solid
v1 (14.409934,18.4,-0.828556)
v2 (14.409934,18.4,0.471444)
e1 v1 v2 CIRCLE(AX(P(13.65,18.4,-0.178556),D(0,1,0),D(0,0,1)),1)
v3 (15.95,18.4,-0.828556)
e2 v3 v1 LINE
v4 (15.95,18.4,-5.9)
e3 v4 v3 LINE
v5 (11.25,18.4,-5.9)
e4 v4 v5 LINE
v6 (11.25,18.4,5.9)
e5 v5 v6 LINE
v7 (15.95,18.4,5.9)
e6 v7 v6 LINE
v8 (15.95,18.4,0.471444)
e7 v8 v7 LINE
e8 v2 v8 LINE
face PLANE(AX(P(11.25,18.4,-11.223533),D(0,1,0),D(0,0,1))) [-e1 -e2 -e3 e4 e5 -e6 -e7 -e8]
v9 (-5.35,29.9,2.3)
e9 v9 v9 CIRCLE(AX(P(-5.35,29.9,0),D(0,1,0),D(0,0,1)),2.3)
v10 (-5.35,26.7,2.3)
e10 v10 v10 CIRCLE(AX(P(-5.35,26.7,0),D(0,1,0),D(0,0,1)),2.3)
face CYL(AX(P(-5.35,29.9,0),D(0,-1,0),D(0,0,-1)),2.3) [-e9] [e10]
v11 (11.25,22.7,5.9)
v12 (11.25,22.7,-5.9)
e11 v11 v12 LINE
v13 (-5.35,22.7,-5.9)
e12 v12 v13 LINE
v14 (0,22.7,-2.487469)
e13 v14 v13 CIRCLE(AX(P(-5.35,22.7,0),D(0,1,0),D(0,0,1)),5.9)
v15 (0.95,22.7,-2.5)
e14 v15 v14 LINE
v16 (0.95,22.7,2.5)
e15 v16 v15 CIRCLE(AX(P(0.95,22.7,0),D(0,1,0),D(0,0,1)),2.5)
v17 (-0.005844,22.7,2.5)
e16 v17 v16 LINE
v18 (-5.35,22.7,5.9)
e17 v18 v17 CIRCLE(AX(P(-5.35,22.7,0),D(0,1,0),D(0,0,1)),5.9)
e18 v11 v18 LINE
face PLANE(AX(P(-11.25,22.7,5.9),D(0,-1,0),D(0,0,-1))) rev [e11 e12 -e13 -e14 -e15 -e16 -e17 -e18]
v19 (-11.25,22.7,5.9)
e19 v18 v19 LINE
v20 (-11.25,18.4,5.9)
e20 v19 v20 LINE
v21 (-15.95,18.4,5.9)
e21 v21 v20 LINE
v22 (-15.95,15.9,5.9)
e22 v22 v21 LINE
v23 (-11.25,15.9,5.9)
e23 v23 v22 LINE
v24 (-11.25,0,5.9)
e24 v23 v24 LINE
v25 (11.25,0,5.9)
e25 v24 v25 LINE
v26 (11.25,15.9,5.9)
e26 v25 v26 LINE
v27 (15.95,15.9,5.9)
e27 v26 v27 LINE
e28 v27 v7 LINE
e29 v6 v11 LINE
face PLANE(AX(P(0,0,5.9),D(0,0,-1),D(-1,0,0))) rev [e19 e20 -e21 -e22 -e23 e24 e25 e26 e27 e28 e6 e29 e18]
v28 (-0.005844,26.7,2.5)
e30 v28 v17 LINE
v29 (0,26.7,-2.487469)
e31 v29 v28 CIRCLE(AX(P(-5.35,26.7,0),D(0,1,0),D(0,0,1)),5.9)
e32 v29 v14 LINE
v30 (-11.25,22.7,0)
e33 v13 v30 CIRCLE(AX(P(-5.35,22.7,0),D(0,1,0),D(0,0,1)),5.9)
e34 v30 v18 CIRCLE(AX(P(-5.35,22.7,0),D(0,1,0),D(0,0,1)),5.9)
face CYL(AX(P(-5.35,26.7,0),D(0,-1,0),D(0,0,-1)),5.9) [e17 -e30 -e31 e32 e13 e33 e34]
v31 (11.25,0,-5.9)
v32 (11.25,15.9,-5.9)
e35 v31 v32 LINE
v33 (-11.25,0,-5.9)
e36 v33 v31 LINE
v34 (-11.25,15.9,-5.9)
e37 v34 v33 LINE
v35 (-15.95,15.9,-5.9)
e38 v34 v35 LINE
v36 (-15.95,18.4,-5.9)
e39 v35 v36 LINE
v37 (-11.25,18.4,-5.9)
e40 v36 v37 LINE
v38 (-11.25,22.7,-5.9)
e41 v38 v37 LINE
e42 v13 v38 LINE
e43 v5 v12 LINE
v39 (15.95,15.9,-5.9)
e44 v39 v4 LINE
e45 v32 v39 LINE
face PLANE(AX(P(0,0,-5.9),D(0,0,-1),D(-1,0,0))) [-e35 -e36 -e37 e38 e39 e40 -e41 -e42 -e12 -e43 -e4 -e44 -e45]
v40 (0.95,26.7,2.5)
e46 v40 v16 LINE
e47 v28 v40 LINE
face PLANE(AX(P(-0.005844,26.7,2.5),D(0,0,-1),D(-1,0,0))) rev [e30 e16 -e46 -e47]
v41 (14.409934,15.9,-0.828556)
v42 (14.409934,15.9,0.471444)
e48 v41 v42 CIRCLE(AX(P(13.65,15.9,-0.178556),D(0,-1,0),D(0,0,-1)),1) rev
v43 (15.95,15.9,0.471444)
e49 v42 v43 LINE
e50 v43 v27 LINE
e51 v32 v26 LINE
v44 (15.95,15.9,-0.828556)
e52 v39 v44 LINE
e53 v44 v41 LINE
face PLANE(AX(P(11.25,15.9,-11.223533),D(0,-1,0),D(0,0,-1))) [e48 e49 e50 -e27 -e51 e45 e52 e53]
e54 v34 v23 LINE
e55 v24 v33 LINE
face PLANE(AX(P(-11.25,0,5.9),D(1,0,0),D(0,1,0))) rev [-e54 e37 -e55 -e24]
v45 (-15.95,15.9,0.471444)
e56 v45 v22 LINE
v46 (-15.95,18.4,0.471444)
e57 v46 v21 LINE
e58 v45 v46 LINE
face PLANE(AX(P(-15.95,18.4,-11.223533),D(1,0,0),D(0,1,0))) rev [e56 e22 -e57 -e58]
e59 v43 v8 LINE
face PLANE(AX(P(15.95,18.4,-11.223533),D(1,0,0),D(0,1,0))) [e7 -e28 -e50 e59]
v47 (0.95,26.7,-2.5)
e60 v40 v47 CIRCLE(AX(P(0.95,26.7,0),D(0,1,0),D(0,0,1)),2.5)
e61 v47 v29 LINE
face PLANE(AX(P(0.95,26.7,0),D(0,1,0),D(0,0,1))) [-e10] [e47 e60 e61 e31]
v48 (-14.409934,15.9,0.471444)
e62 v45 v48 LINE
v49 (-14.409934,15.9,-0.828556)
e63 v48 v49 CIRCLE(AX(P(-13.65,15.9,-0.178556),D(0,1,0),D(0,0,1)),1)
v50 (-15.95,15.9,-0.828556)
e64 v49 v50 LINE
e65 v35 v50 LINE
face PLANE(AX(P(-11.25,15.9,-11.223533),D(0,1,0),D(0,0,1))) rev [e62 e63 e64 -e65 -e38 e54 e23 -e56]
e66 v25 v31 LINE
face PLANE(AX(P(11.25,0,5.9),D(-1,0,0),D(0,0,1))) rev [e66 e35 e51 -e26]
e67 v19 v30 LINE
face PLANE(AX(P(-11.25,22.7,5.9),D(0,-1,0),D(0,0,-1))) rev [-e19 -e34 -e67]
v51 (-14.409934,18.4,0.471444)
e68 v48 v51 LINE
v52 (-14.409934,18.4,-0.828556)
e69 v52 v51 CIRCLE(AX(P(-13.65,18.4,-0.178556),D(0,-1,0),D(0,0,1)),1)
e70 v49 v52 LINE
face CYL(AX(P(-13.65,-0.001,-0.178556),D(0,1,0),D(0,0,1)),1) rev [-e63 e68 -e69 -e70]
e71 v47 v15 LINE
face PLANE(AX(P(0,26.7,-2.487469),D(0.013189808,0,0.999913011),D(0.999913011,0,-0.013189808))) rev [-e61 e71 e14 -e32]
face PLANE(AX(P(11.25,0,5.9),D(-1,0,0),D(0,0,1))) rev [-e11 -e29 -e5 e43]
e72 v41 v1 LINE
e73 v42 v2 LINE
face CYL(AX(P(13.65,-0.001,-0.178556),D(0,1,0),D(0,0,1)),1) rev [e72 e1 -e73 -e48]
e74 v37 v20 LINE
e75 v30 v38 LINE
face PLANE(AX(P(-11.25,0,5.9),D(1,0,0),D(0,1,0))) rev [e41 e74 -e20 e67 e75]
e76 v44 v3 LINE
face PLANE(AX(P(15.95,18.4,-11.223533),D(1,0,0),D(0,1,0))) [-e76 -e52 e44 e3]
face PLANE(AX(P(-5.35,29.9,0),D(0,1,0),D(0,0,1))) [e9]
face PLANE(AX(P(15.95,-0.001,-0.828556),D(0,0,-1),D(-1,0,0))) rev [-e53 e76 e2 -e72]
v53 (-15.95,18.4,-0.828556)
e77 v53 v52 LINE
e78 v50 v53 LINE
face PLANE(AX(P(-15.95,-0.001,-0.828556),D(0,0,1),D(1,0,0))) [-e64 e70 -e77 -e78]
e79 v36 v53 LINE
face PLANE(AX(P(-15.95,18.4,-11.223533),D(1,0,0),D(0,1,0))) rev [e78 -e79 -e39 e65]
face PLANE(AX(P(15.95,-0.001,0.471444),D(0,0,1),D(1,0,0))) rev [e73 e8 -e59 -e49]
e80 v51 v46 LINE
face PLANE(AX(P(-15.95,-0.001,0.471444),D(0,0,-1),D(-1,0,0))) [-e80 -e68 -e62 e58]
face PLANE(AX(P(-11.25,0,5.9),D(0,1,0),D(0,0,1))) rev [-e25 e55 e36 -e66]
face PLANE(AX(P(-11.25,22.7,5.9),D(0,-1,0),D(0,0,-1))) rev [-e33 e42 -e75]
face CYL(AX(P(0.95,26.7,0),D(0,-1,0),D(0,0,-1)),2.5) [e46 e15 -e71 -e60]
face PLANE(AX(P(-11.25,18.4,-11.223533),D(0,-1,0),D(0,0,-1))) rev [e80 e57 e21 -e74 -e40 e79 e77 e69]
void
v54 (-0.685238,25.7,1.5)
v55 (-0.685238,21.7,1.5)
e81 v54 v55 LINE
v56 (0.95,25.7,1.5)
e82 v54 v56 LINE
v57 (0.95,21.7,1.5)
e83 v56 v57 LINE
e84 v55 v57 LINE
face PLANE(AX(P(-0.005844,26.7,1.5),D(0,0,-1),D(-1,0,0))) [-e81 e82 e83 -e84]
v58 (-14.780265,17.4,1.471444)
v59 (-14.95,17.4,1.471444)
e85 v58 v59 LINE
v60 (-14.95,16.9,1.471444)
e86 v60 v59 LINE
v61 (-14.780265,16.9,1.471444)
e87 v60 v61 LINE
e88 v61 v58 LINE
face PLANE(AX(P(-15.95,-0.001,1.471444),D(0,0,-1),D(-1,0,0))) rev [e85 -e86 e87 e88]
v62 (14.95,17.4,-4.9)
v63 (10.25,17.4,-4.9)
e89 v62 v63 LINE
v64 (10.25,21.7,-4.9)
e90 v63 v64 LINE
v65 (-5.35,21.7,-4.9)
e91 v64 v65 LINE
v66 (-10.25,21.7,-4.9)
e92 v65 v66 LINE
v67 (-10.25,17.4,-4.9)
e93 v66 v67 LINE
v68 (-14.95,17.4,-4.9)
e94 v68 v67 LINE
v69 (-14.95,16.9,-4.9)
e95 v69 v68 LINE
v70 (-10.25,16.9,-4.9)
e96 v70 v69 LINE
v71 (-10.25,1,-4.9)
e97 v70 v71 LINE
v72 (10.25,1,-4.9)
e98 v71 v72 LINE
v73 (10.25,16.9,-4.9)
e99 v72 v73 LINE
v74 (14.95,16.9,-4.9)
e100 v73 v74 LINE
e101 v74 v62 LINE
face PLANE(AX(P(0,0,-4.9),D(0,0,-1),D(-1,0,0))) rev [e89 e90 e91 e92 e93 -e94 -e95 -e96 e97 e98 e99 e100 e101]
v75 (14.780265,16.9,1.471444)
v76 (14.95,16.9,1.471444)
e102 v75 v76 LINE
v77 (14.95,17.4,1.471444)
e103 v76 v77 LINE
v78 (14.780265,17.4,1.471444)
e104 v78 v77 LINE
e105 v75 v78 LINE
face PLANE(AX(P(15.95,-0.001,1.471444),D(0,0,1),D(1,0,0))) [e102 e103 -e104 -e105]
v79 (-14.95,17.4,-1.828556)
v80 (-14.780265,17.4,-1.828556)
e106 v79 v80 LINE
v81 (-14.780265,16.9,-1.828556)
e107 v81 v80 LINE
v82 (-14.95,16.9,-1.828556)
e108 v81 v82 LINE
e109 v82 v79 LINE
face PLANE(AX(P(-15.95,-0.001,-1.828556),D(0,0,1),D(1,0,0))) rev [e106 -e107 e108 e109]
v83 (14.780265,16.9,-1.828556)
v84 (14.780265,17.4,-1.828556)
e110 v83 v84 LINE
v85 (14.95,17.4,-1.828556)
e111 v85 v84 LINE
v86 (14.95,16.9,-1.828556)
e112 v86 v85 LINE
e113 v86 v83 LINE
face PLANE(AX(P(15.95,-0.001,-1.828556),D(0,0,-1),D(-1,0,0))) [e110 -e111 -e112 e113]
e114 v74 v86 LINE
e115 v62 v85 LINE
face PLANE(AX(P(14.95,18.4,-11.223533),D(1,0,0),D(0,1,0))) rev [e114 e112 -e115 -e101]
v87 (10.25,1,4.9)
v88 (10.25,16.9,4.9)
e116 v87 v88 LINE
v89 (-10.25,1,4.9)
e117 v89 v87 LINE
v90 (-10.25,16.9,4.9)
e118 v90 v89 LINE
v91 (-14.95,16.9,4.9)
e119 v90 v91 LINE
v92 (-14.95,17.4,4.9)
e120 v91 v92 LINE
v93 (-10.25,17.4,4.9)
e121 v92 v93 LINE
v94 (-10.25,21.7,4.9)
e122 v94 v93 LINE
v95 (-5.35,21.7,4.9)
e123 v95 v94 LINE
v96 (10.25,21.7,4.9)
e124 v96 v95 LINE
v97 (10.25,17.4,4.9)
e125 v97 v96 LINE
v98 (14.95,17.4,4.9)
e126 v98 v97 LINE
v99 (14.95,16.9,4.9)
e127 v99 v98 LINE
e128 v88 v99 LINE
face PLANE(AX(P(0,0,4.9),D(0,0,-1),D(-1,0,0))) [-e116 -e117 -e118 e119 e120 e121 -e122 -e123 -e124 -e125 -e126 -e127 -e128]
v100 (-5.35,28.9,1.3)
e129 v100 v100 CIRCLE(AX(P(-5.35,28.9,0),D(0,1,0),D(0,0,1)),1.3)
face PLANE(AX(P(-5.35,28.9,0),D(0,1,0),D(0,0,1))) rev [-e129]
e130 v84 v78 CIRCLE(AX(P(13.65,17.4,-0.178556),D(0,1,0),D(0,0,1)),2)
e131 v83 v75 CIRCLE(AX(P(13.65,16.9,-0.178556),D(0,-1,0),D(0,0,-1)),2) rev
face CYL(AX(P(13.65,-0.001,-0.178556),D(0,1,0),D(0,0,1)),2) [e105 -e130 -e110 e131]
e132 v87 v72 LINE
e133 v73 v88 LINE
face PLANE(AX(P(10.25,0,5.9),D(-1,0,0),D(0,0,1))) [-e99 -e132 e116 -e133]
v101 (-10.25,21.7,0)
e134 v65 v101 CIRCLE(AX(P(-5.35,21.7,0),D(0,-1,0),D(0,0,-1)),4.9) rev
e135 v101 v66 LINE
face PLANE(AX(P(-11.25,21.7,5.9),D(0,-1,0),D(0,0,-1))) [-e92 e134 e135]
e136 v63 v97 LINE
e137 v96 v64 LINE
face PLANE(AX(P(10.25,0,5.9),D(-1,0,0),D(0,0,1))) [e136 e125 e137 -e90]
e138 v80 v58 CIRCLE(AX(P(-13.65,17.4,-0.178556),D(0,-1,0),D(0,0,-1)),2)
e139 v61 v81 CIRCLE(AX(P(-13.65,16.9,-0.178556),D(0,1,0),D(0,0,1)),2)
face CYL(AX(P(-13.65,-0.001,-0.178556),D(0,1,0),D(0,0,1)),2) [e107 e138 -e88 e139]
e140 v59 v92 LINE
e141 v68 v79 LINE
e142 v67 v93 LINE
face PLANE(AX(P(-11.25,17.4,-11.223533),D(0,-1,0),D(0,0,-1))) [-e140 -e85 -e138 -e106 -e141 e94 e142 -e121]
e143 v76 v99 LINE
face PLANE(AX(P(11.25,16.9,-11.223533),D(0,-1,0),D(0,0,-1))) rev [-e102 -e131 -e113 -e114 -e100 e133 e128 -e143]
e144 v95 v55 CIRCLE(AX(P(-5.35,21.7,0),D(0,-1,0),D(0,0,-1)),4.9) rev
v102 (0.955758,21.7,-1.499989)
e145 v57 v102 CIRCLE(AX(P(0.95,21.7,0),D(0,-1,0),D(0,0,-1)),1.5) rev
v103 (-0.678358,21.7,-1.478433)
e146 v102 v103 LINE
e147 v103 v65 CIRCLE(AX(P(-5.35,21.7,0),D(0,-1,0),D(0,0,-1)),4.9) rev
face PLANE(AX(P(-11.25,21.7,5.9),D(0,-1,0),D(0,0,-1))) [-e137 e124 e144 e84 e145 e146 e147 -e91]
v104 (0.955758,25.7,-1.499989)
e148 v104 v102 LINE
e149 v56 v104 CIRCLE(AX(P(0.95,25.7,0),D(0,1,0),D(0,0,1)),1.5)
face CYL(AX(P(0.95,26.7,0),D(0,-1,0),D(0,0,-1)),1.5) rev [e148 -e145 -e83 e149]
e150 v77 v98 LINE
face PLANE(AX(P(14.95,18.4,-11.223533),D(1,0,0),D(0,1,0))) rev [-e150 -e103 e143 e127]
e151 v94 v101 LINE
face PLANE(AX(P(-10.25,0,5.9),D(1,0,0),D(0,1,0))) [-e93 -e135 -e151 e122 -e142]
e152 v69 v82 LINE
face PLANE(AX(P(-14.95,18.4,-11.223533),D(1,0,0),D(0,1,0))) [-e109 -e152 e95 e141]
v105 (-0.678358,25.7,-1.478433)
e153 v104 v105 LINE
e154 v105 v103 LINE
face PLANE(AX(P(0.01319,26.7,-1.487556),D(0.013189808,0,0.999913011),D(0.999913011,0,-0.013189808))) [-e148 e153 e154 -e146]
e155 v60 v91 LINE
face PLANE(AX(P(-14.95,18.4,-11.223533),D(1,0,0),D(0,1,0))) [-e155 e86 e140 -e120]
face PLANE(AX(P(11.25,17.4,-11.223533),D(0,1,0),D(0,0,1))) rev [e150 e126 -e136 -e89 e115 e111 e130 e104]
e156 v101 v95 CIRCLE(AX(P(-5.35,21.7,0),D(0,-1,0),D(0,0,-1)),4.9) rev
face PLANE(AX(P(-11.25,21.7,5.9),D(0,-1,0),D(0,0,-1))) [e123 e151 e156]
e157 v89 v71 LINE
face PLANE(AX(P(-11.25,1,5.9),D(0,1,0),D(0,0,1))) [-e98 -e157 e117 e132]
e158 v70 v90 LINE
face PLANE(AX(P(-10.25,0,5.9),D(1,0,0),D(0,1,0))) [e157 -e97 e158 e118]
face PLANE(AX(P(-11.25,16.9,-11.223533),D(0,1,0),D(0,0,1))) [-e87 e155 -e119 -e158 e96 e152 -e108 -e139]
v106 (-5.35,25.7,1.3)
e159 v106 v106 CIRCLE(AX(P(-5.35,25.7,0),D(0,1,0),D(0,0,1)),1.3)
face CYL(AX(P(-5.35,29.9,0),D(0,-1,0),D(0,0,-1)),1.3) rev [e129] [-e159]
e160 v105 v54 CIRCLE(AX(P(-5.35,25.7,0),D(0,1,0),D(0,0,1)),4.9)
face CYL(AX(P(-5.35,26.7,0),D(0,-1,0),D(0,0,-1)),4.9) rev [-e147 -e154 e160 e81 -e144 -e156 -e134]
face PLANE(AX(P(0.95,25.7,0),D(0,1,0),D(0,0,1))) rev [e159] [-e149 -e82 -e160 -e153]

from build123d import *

# Parameters (mm, degrees)
SKETCH1_W           = 22.5
SKETCH1_H           = 22.7
BOSS_EXTRUDE1_DEPTH = 5.9
SKETCH2_W           = 4.7
SKETCH2_H           = 2.5
BOSS_EXTRUDE2_DEPTH = 11.8
CUT_EXTRUDE1_REACH  = 27.055
BOSS_EXTRUDE3_DEPTH = 4
SKETCH5_R           = 2.3
BOSS_EXTRUDE4_DEPTH = 3.2
SHELL3_START        = 1
SHELL3_OUTLINE_W    = 20.5
SHELL3_OUTLINE_H    = 9.8
SHELL3_DEPTH        = 20.7
SHELL3_START_2      = 21.7
SHELL3_2_DEPTH      = 4
SHELL3_START_3      = 16.9
SHELL3_3_DEPTH      = 0.5
SHELL3_START_4      = 25.7
SHELL3_4_OUTLINE_R  = 1.3
SHELL3_4_DEPTH      = 3.2


# Read off the part's stored shape, not the designer's step: Shell3
with BuildPart() as part:
    # Sketch1 → Boss-Extrude1 (new, symmetric)
    with BuildSketch(Plane.XY):
        with Locations((0, 11.35)):
            Rectangle(SKETCH1_W, SKETCH1_H)
    extrude(amount=BOSS_EXTRUDE1_DEPTH, both=True)

    # Sketch2 → Boss-Extrude2 (add)
    with BuildSketch(Plane.XY.offset(5.9)):
        with Locations((13.6, 17.15)):
            Rectangle(SKETCH2_W, SKETCH2_H)
    boss_extrude2 = extrude(amount=-BOSS_EXTRUDE2_DEPTH)

    # Sketch3 → Cut-Extrude1 (cut, up to next)
    with BuildSketch(Plane(origin=(0, 18.4, 0), x_dir=(1, 0, 0), z_dir=(0, 1, 0)), mode=Mode.PRIVATE) as cut_extrude1_sk1:
        with BuildLine():
            Line((15.95, 0.828555983), (14.409934208, 0.828555983))
            ThreePointArc((14.409934208, 0.828555983), (12.65, 0.178555983), (14.409934208, -0.471444017))
            Line((14.409934208, -0.471444017), (15.95, -0.471444017))
            Line((15.95, -0.471444017), (15.95, 0.828555983))
        make_face()
    cut_extrude1_tool1 = extrude(cut_extrude1_sk1.sketch, amount=-CUT_EXTRUDE1_REACH, mode=Mode.PRIVATE) & part.part
    cut_extrude1 = cut_extrude1_tool1.solids().sort_by_distance((14.234181, 18.4, -0.178556))[0]
    add(cut_extrude1, mode=Mode.SUBTRACT)

    # Mirror1: Boss-Extrude2, Cut-Extrude1 across plane
    add(boss_extrude2.mirror(Plane(origin=(0, 0, 0), x_dir=(0, 0, 1), z_dir=(1, 0, 0))))
    add(cut_extrude1.mirror(Plane(origin=(0, 0, 0), x_dir=(0, 0, 1), z_dir=(1, 0, 0))), mode=Mode.SUBTRACT)

    # Sketch4 → Boss-Extrude3 (add)
    with BuildSketch(Plane(origin=(0, 22.7, 0), x_dir=(1, 0, 0), z_dir=(0, 1, 0))):
        with BuildLine():
            Line((0, 2.487468593), (0.95, 2.5))
            ThreePointArc((0.95, 2.5), (3.45, 0), (0.95, -2.5))
            Line((0.95, -2.5), (-0.005844314, -2.5))
            ThreePointArc((-0.005844314, -2.5), (-11.249995949, 0.006913613), (0, 2.487468593))
        make_face()
    extrude(amount=BOSS_EXTRUDE3_DEPTH)

    # Sketch5 → Boss-Extrude4 (add)
    with BuildSketch(Plane(origin=(0, 26.7, 0), x_dir=(1, 0, 0), z_dir=(0, 1, 0))):
        with Locations(Location((-5.35, 0, 0), (0, 0, 270))):
            Circle(SKETCH5_R)
    extrude(amount=BOSS_EXTRUDE4_DEPTH)

    # Shell3 outline → Shell3 (cut)
    with BuildSketch(Plane(origin=(0, 0, 0), x_dir=(1, 0, 0), z_dir=(0, 1, 0)).offset(SHELL3_START)):
        Rectangle(SHELL3_OUTLINE_W, SHELL3_OUTLINE_H)
    extrude(amount=SHELL3_DEPTH, mode=Mode.SUBTRACT)

    # Shell3 2 outline → Shell3 2 (cut)
    with BuildSketch(Plane(origin=(0, 0, 0), x_dir=(1, 0, 0), z_dir=(0, 1, 0)).offset(SHELL3_START_2)):
        with BuildLine():
            Line((-0.685238484, -1.5), (0.95, -1.5))
            ThreePointArc((0.95, -1.5), (2.449997238, -0.002878764), (0.955757517, 1.49998895))
            Line((0.955757517, 1.49998895), (-0.67835846, 1.4784334))
            ThreePointArc((-0.67835846, 1.4784334), (-10.249986927, 0.01131871), (-0.685238484, -1.5))
        make_face()
    extrude(amount=SHELL3_2_DEPTH, mode=Mode.SUBTRACT)

    # Shell3 3 outline → Shell3 3 (cut)
    with BuildSketch(Plane(origin=(0, 0, 0), x_dir=(1, 0, 0), z_dir=(0, 1, 0)).offset(SHELL3_START_3)):
        with BuildLine():
            Line((-14.95, 4.9), (-14.95, 1.828555983))
            Line((-14.95, 1.828555983), (-14.780265456, 1.828555983))
            ThreePointArc((-14.780265456, 1.828555983), (-11.65, 0.178555983), (-14.780265456, -1.471444017))
            Line((-14.780265456, -1.471444017), (-14.95, -1.471444017))
            Line((-14.95, -1.471444017), (-14.95, -4.9))
            Line((-14.95, -4.9), (-10.25, -4.9))
            Line((-10.25, -4.9), (-10.25, 4.9))
            Line((-10.25, 4.9), (-14.95, 4.9))
        make_face()
        with BuildLine():
            Line((14.95, 4.9), (10.25, 4.9))
            Line((10.25, 4.9), (10.25, -4.9))
            Line((10.25, -4.9), (14.95, -4.9))
            Line((14.95, -4.9), (14.95, -1.471444017))
            Line((14.95, -1.471444017), (14.780265456, -1.471444017))
            ThreePointArc((14.780265456, -1.471444017), (11.65, 0.178555983), (14.780265456, 1.828555983))
            Line((14.780265456, 1.828555983), (14.95, 1.828555983))
            Line((14.95, 1.828555983), (14.95, 4.9))
        make_face()
    extrude(amount=SHELL3_3_DEPTH, mode=Mode.SUBTRACT)

    # Shell3 4 outline → Shell3 4 (cut)
    with BuildSketch(Plane(origin=(0, 0, 0), x_dir=(1, 0, 0), z_dir=(0, 1, 0)).offset(SHELL3_START_4)):
        with Locations((-5.35, 0)):
            Circle(SHELL3_4_OUTLINE_R)
    extrude(amount=SHELL3_4_DEPTH, mode=Mode.SUBTRACT)


solid = part.part
